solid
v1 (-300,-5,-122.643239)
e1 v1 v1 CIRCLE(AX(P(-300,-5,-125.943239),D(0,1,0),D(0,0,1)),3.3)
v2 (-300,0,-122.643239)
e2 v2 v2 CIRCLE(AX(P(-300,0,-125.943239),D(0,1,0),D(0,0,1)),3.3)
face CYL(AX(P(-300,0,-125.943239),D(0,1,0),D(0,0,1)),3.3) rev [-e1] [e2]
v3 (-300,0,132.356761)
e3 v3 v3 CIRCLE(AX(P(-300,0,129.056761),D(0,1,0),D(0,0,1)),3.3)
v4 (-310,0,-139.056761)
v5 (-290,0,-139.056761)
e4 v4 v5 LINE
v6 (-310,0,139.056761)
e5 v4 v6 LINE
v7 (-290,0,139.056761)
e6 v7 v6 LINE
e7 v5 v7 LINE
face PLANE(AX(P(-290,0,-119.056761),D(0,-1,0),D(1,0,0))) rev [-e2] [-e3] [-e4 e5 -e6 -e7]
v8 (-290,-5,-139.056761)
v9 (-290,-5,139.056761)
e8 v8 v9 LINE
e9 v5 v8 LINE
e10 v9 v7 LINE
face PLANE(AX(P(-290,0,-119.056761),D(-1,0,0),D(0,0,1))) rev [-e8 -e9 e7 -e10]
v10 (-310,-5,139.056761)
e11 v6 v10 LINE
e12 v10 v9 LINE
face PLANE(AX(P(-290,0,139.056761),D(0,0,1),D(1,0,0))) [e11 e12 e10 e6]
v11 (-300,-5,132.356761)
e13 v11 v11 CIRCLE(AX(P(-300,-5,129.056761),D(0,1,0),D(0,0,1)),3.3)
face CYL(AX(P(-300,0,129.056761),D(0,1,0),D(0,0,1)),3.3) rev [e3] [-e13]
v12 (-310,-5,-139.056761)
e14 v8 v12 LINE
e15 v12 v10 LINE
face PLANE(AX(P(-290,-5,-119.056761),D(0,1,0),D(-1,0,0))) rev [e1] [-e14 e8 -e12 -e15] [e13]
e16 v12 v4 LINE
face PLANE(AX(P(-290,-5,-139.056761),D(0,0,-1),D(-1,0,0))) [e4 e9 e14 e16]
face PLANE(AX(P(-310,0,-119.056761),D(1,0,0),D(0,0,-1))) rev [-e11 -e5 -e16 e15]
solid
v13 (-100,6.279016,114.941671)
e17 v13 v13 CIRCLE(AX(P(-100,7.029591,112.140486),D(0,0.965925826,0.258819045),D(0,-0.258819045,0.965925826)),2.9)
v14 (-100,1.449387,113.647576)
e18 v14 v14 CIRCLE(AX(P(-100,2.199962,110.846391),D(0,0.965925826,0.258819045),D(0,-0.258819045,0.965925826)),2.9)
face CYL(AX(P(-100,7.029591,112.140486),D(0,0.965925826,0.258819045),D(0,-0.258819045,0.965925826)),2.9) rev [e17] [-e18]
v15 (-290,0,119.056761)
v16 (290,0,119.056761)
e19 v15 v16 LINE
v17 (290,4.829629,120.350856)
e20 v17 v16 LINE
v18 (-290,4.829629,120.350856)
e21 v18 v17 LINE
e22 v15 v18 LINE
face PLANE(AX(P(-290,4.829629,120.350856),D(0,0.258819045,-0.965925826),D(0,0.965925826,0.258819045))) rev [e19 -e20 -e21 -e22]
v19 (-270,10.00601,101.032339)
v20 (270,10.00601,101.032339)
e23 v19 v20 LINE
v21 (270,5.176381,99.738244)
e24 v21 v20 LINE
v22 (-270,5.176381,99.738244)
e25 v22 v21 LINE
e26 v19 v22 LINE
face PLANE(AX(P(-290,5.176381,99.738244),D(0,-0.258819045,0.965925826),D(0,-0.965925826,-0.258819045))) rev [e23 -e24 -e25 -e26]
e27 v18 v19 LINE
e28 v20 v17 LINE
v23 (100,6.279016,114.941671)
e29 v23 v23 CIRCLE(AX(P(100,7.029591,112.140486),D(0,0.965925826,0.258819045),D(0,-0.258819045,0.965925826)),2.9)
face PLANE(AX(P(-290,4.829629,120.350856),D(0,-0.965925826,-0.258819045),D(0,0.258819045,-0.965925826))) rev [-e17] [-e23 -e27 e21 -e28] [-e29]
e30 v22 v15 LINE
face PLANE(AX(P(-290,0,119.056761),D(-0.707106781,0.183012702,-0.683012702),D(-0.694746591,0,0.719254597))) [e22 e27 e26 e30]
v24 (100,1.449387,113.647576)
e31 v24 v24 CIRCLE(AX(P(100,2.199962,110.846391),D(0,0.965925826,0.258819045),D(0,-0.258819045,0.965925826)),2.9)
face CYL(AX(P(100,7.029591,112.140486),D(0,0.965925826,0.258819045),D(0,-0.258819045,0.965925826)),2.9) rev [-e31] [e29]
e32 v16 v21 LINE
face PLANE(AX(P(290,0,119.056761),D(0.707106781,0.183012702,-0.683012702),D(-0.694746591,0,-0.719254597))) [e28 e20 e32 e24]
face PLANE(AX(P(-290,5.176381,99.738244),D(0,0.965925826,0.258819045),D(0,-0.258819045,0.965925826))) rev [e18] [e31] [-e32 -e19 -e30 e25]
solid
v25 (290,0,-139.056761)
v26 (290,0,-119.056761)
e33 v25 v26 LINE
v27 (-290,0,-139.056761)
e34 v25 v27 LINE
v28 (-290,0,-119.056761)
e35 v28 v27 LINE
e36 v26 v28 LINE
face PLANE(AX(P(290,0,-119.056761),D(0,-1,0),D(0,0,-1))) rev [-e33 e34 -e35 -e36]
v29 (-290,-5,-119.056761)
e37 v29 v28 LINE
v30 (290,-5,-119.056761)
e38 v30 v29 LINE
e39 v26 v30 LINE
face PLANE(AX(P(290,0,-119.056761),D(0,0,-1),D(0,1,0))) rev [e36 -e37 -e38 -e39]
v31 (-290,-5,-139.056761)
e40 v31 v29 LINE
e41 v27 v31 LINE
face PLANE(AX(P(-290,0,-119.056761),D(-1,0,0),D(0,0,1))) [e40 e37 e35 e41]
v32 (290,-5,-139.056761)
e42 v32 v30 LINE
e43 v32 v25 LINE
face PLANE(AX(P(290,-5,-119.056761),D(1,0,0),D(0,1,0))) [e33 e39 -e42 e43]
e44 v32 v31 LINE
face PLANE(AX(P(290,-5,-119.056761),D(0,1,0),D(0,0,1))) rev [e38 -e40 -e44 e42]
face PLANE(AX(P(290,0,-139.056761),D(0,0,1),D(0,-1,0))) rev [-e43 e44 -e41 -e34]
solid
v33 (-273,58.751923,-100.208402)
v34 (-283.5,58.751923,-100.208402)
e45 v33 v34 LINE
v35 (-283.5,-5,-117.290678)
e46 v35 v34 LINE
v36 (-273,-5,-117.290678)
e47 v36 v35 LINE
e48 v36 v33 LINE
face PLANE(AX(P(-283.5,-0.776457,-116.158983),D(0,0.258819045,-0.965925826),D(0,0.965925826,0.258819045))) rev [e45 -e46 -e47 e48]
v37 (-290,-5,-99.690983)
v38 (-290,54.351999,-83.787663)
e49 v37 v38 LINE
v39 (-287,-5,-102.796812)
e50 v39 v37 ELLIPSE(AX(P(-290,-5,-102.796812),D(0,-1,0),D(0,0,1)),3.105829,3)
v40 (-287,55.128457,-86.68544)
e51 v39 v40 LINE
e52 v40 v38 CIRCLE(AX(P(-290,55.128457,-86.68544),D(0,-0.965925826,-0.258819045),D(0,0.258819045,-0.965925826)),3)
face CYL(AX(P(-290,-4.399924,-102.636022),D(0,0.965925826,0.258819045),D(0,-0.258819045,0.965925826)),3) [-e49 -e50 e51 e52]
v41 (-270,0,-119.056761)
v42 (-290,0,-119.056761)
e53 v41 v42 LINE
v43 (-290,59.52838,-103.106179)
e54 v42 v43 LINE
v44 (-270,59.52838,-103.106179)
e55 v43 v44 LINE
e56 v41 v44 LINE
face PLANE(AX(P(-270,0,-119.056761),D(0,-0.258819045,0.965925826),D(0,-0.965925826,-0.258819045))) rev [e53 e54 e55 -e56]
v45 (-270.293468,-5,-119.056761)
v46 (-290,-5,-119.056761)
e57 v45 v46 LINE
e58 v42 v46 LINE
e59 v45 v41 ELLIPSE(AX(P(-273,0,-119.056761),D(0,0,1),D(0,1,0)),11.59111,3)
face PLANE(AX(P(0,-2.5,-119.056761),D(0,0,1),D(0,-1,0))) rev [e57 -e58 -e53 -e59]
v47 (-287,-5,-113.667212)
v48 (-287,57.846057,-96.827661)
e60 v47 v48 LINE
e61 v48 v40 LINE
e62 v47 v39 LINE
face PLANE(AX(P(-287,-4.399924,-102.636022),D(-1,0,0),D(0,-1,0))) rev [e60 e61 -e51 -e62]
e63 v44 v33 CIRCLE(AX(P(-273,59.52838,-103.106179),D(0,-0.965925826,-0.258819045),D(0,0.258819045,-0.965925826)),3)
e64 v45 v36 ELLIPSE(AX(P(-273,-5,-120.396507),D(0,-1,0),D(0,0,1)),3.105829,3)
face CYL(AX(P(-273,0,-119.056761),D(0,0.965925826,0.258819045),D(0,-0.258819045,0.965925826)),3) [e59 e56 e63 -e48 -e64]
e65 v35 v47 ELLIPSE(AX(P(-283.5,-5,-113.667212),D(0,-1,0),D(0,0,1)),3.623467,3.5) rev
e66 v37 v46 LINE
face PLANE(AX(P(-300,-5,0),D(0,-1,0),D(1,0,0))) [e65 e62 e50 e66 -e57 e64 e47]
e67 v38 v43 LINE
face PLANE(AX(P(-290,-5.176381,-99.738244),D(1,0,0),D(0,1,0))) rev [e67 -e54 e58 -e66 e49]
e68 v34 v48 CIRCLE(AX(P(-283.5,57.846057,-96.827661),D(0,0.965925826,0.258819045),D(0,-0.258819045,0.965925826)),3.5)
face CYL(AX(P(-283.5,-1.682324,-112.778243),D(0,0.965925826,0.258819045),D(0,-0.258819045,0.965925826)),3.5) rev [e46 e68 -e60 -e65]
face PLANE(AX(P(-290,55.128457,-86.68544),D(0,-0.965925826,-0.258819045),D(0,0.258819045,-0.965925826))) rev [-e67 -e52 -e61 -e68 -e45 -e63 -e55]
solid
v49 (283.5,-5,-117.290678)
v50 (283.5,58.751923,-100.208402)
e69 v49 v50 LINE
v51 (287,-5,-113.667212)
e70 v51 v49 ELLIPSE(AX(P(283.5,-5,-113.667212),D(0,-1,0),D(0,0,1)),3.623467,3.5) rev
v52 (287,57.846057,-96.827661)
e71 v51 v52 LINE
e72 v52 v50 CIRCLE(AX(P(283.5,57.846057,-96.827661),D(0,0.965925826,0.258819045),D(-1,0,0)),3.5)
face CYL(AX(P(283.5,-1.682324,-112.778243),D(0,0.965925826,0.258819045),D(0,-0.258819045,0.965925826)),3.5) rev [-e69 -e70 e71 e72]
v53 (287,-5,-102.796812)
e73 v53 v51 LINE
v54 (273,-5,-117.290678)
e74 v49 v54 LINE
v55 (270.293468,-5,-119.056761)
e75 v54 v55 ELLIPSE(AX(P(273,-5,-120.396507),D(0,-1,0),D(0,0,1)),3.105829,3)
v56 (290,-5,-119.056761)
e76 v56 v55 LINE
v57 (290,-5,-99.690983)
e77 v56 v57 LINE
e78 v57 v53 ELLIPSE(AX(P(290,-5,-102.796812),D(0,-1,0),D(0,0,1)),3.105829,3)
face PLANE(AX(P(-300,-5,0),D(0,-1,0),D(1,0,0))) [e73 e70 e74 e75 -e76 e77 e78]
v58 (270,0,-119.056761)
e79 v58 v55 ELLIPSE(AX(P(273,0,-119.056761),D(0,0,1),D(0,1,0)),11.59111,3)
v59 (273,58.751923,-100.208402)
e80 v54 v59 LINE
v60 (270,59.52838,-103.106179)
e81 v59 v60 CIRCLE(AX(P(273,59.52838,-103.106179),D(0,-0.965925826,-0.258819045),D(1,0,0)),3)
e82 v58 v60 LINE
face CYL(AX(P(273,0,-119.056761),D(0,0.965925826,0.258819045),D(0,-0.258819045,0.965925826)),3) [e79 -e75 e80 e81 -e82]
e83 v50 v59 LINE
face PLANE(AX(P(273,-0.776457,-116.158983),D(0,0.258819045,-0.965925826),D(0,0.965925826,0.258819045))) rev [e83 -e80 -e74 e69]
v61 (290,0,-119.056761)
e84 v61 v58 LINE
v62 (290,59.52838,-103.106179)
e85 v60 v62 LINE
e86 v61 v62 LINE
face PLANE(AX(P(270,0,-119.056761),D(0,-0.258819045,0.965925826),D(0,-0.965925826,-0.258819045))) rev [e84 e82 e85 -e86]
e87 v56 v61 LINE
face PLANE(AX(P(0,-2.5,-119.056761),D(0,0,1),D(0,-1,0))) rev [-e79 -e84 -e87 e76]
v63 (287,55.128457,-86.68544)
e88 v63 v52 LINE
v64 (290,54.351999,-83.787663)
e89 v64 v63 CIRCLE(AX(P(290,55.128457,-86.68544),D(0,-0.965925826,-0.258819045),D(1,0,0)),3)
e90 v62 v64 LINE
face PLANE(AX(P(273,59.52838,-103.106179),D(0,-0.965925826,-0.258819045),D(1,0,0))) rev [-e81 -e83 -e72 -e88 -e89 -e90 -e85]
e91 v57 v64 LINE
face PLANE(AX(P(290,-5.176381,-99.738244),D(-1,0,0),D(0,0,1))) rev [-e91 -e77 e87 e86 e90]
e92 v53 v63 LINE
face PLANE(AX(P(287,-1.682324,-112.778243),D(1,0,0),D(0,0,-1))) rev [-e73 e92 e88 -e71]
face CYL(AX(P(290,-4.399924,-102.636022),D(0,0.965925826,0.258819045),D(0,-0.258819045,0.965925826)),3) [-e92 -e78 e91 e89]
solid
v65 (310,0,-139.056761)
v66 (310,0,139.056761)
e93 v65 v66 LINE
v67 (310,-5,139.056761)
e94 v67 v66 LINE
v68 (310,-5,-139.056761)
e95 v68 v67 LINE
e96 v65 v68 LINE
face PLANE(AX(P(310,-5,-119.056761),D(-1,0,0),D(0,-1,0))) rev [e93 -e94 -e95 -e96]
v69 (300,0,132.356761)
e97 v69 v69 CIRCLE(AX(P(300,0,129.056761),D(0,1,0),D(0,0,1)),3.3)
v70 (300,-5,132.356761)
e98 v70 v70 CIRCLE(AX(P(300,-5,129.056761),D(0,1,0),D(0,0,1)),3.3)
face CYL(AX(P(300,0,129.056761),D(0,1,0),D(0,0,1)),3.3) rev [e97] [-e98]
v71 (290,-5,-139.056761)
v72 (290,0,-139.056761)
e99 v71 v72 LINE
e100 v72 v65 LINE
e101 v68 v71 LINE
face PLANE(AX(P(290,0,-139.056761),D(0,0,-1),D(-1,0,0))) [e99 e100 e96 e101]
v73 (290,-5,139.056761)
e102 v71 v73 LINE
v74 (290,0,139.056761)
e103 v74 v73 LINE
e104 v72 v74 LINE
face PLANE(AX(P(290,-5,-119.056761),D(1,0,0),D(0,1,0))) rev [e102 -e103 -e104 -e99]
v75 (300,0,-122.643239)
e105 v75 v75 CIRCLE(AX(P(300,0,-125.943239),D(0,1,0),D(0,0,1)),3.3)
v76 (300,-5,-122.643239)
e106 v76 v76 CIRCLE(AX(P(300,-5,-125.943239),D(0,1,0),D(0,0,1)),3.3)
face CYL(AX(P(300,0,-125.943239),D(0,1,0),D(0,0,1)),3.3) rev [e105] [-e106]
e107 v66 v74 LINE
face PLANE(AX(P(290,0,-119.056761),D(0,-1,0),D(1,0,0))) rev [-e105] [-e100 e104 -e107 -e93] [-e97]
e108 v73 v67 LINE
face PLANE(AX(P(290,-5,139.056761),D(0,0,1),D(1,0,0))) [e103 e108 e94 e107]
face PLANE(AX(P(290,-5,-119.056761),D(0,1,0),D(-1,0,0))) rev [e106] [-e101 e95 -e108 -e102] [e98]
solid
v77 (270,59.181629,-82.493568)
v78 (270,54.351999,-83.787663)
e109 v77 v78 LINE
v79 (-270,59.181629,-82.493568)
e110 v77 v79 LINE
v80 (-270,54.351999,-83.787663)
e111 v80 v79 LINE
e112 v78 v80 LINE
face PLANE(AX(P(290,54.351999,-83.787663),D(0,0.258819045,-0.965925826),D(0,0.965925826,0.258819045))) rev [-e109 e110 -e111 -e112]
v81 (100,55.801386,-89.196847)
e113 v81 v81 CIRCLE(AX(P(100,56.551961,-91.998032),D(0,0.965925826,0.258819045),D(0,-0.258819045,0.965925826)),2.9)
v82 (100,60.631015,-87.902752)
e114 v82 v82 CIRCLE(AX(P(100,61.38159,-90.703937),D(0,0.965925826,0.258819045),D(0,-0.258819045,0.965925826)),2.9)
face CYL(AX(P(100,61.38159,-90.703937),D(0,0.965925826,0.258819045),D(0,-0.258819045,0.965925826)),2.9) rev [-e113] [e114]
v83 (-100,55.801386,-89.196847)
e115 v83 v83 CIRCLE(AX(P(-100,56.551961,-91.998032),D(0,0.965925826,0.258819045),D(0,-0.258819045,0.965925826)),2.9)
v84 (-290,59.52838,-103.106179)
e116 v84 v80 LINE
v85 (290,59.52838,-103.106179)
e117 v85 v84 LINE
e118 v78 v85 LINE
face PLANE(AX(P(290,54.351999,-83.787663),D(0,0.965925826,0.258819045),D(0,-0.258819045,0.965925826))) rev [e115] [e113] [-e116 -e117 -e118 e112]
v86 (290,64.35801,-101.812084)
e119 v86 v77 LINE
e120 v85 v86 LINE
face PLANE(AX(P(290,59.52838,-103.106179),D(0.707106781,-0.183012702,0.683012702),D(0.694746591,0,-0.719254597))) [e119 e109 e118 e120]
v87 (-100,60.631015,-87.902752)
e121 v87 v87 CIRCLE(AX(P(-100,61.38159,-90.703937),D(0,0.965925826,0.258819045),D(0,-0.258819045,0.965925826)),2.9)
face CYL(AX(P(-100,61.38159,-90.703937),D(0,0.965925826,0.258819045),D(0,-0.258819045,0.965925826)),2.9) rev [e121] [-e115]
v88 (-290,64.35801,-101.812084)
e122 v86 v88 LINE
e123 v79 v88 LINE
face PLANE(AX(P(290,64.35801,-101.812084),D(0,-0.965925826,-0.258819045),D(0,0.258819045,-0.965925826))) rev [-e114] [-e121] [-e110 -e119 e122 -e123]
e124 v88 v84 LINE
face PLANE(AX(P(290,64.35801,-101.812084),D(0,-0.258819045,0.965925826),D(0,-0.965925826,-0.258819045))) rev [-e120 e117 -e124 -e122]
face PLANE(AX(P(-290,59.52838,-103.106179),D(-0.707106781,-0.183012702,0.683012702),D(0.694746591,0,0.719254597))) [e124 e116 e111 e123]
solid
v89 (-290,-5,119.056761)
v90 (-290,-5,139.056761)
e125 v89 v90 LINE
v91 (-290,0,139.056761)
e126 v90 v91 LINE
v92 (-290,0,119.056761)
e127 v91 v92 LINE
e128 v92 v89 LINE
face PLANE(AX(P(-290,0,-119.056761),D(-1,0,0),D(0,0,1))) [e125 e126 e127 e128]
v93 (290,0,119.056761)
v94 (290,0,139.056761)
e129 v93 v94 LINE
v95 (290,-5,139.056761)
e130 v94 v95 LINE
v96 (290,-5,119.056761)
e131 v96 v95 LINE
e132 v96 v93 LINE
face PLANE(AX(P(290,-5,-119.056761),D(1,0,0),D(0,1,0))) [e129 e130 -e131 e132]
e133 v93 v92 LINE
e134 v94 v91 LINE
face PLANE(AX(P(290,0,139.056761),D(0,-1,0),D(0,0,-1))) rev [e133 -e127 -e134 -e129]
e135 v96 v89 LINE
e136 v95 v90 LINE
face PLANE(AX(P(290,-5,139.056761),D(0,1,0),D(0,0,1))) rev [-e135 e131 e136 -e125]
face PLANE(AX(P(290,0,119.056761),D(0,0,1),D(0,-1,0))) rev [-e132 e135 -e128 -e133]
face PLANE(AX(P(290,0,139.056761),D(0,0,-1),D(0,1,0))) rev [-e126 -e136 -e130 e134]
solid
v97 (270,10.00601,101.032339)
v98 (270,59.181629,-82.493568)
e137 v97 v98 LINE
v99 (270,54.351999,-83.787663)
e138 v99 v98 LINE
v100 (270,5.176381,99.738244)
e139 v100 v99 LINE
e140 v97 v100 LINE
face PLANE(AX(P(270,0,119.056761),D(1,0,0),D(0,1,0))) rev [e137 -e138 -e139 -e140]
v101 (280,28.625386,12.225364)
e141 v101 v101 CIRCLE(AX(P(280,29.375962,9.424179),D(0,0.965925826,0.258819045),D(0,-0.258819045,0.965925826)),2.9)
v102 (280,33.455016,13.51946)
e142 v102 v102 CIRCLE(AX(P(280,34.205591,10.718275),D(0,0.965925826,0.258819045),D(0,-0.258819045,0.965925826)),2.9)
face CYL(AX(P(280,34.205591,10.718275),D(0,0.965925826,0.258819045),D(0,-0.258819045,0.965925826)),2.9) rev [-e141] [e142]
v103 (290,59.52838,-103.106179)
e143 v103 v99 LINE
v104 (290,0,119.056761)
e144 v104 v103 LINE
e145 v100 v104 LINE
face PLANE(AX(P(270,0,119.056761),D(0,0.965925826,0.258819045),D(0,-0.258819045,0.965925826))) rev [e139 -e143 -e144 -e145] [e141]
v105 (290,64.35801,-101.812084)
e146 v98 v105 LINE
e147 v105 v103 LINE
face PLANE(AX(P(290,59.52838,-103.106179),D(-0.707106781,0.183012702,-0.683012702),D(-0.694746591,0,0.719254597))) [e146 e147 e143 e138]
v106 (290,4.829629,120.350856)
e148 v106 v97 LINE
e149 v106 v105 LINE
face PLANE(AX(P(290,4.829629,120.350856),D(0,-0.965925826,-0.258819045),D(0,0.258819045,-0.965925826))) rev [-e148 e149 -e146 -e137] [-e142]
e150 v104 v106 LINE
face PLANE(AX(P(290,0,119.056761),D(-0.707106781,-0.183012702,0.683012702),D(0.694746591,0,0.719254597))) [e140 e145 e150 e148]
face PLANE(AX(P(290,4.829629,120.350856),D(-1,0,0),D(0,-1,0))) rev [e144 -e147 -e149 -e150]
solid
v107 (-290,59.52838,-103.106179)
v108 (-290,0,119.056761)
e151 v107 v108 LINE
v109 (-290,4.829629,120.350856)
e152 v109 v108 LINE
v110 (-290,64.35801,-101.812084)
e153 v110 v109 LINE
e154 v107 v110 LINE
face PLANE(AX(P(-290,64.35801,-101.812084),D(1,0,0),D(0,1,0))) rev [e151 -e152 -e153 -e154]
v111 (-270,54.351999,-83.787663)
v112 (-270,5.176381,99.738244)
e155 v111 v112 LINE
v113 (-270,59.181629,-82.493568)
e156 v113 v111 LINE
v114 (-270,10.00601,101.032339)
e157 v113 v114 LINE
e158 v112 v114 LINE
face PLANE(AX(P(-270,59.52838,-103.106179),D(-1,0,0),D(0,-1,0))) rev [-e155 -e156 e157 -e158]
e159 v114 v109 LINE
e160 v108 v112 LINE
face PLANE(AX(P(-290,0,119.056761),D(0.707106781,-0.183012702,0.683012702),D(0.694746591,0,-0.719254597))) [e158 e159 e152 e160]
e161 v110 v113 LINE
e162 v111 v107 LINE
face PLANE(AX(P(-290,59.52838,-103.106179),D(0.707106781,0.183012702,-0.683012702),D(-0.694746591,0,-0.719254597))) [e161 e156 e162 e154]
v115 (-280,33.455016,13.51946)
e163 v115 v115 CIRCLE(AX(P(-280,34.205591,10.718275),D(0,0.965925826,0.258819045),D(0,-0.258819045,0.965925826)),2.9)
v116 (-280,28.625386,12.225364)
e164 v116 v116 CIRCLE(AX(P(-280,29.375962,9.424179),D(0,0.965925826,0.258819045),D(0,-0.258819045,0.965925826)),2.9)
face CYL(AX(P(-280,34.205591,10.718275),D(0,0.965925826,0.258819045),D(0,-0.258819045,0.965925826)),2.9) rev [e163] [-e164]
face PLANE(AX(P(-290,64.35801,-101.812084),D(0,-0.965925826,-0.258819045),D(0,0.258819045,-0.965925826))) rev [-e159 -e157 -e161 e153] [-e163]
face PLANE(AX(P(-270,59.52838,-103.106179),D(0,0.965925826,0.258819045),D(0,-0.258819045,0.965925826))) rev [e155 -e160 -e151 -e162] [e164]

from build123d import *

# Parameters (mm, degrees)
TUBE_RECTANGULAR_50_X_30_X_2_6_46_DEPTH      = 251.615528128
TUBE_RECTANGULAR_50_X_30_X_2_6_46_DEPTH_BACK = 21.615528128
SKETCH1_W                                    = 20
SKETCH1_H                                    = 5
SKETCH1_ON_SEGMENT_2_W                       = 20
SKETCH1_ON_SEGMENT_2_H                       = 5
TUBE_RECTANGULAR_50_X_30_X_2_6_46_3_DEPTH    = 623.231056256
SKETCH1_ON_SEGMENT_3_W                       = 20
SKETCH1_ON_SEGMENT_3_H                       = 5
TUBE_RECTANGULAR_50_X_30_X_2_6_46_5_DEPTH    = 273.231056256
SKETCH1_ON_SEGMENT_4_W                       = 20
SKETCH1_ON_SEGMENT_4_H                       = 5
TUBE_RECTANGULAR_50_X_30_X_2_6_46_7_DEPTH    = 623.231056256
L_ANGLE_EQUAL_20X20X3_13_DEPTH               = 61.628314259
L_ANGLE_EQUAL_20X20X3_13_2_DEPTH             = 61.628314259
TUBE_START                                   = -5
TUBE_RECTANGULAR_50_X_30_X_2_6_47_OUTL_W     = 20
TUBE_RECTANGULAR_50_X_30_X_2_6_47_OUTL_H     = 278.113521494
TUBE_RECTANGULAR_50_X_30_X_2_6_47_DEPTH      = 5
TUBE_START_2                                 = -290
TUBE_RECTANGULAR_50_X_30_X_2_6_47_2_OU_W     = 5
TUBE_RECTANGULAR_50_X_30_X_2_6_47_2_OU_H     = 20
TUBE_RECTANGULAR_50_X_30_X_2_6_47_2_DEPTH    = 580
TUBE_RECTANGULAR_50_X_30_X_2_6_47_3_OU_W     = 5
TUBE_RECTANGULAR_50_X_30_X_2_6_47_3_OU_H     = 20
TUBE_RECTANGULAR_50_X_30_X_2_6_47_3_DEPTH    = 580
TUBE_RECTANGULAR_50_X_30_X_2_6_47_4_OU_W     = 20
TUBE_RECTANGULAR_50_X_30_X_2_6_47_4_OU_H     = 278.113521494
TUBE_RECTANGULAR_50_X_30_X_2_6_47_4_DEPTH    = 5
BODY_START                                   = 61.628314241
BODY_5_RUN_ON_DEPTH                          = 5.176381
BODY_START_2                                 = 61.62831424
BODY_6_RUN_ON_DEPTH                          = 5.176381
SKETCH20_W                                   = 3.3
SKETCH20_H                                   = 5
M6_CLEARANCE_HOLE1_AT_2_COUNT                = 2
M6_CLEARANCE_HOLE1_AT_2_PITCH                = 255
M6_CLEARANCE_HOLE1_AT_3_COUNT                = 2
M6_CLEARANCE_HOLE1_AT_3_PITCH                = 651.939414363
M6_CLEARANCE_HOLE1_AT_4_COUNT                = 2
M6_CLEARANCE_HOLE1_AT_4_PITCH                = 600
ESQUISSE2_W                                  = 2.9
ESQUISSE2_H                                  = 76.634324293
D_GAGEMENT_M51_AT_2_COUNT                    = 2
D_GAGEMENT_M51_AT_2_PITCH                    = 290
D_GAGEMENT_M51_AT_3_COUNT                    = 2
D_GAGEMENT_M51_AT_3_PITCH                    = 210
D_GAGEMENT_M51_AT_4_COUNT                    = 2
D_GAGEMENT_M51_AT_4_PITCH                    = 208.386659842
D_GAGEMENT_M51_AT_5_COUNT                    = 2
D_GAGEMENT_M51_AT_5_PITCH                    = 394.239774756
D_GAGEMENT_M51_AT_6_COUNT                    = 2
D_GAGEMENT_M51_AT_6_PITCH                    = 200


# Read off the part's stored shape, not the designer's step: Tube (rectangular) 50 X 30 X 2.6(47)
with BuildPart() as part:
    # Sketch1 → Tube (rectangular) 50 X 30 X 2.6(46) (new, two sides: drawn at the far end of the back side and taken through both)
    with BuildSketch(Plane(origin=(-280, 2.414814566, 119.70380836), x_dir=(1, 0, 0), z_dir=(1.2067641572012591e-15, 0.25881904510252146, -0.9659258262890681)).offset(-TUBE_RECTANGULAR_50_X_30_X_2_6_46_DEPTH_BACK)):
        Rectangle(SKETCH1_W, SKETCH1_H)
    extrude(amount=TUBE_RECTANGULAR_50_X_30_X_2_6_46_DEPTH + TUBE_RECTANGULAR_50_X_30_X_2_6_46_DEPTH_BACK)

    # Tube (rectangular) 50 X 30 X 2.6(46) mitr
    split(bisect_by=Plane(origin=(-290, 0, 119.056760747), x_dir=(-0.250562807, -0.968100346, 0), z_dir=(-0.707106781, 0.183012702, -0.683012702)), keep=Keep.TOP)

    # Tube (rectangular) 50 X 30 X 2.6(46)  2
    split(bisect_by=Plane(origin=(-290, 59.528380374, -103.106179299), x_dir=(0.250562807, -0.968100346, 0), z_dir=(-0.707106781, -0.183012702, 0.683012702)), keep=Keep.TOP)


with BuildPart() as body_2:
    # Sketch1 on segment 2 (carried to segment 2) → Tube (rectangular) 50 X 30 X 2.6(46)  3 (new body)
    with BuildSketch(Plane(origin=(-311.615528128, 59.355004488, -92.799873424), x_dir=(0, -0.258819045, 0.965925826), z_dir=(1, 0, 0))):
        Rectangle(SKETCH1_ON_SEGMENT_2_W, SKETCH1_ON_SEGMENT_2_H)
    extrude(amount=TUBE_RECTANGULAR_50_X_30_X_2_6_46_3_DEPTH)

    # Tube _rectangular_ 50 X 30 X 2.6_46 3 mi
    split(bisect_by=Plane(origin=(-290, 59.528380374, -103.106179299), x_dir=(-0.250562807, 0.968100346, 0), z_dir=(0.707106781, 0.183012702, -0.683012702)), keep=Keep.TOP)

    # Tube (rectangular) 50 X 30 X 2.6(46)  4
    split(bisect_by=Plane(origin=(290, 59.528380374, -103.106179299), x_dir=(-0.250562807, -0.968100346, 0), z_dir=(-0.707106781, 0.183012702, -0.683012702)), keep=Keep.TOP)


with BuildPart() as body_3:
    # Sketch1 on segment 3 (carried to segment 3) → Tube (rectangular) 50 X 30 X 2.6(46)  5 (new body)
    with BuildSketch(Plane(origin=(280, 67.537705289, -123.338128554), x_dir=(-1, 0, 0), z_dir=(0, -0.258819045, 0.965925826))):
        Rectangle(SKETCH1_ON_SEGMENT_3_W, SKETCH1_ON_SEGMENT_3_H)
    extrude(amount=TUBE_RECTANGULAR_50_X_30_X_2_6_46_5_DEPTH)

    # Tube _rectangular_ 50 X 30 X 2.6_46 5 mi
    split(bisect_by=Plane(origin=(290, 59.528380374, -103.106179299), x_dir=(0.250562807, 0.968100346, 0), z_dir=(0.707106781, -0.183012702, 0.683012702)), keep=Keep.TOP)

    # Tube (rectangular) 50 X 30 X 2.6(46)  6
    split(bisect_by=Plane(origin=(290, 0, 119.056760747), x_dir=(-0.250562807, 0.968100346, 0), z_dir=(0.707106781, 0.183012702, -0.683012702)), keep=Keep.TOP)


with BuildPart() as body_4:
    # Sketch1 on segment 4 (carried to segment 4) → Tube (rectangular) 50 X 30 X 2.6(46)  7 (new body)
    with BuildSketch(Plane(origin=(311.615528128, 5.003005017, 110.044550097), x_dir=(0, 0.258819045, -0.965925826), z_dir=(-1, 0, 0))):
        Rectangle(SKETCH1_ON_SEGMENT_4_W, SKETCH1_ON_SEGMENT_4_H)
    extrude(amount=TUBE_RECTANGULAR_50_X_30_X_2_6_46_7_DEPTH)

    # Tube _rectangular_ 50 X 30 X 2.6_46 7 mi
    split(bisect_by=Plane(origin=(-290, 0, 119.056760747), x_dir=(0.250562807, 0.968100346, 0), z_dir=(0.707106781, -0.183012702, 0.683012702)), keep=Keep.TOP)

    # Tube (rectangular) 50 X 30 X 2.6(46)  8
    split(bisect_by=Plane(origin=(290, 0, 119.056760747), x_dir=(0.250562807, -0.968100346, 0), z_dir=(-0.707106781, -0.183012702, 0.683012702)), keep=Keep.TOP)

    # Esquisse2 → Dégagement M51 (revolve, cut)
    with BuildSketch(Plane(origin=(100, 7.029591015, 112.140486449), x_dir=(0, -0.2588190451025213, 0.9659258262890682), z_dir=(1, 0, 0))):
        with Locations((1.45, 38.317162147)):
            Rectangle(ESQUISSE2_W, ESQUISSE2_H)
    d_gagement_m51 = revolve(axis=Axis((100, 13.163220012, 113.783987386), (-9.20037838079571e-15, -0.9659258262890682, -0.25881904510252135)), mode=Mode.SUBTRACT)

    # Dégagement M51 at 6: Dégagement M51 ×2
    with Locations(*[(-i * D_GAGEMENT_M51_AT_6_PITCH, 0, 0) for i in range(1, D_GAGEMENT_M51_AT_6_COUNT)]):
        add(d_gagement_m51, mode=Mode.SUBTRACT)


with BuildPart() as body_5:
    # Sketch13 → L angle (equal) 20X20X3(13) (new body)
    with BuildSketch(Plane(origin=(-290, 59.528380374, -103.106179299), x_dir=(1, 0, 0), z_dir=(0, -0.9659258262890681, -0.25881904510252174))):
        with BuildLine():
            Line((0, 20), (0, 0))
            Line((0, 0), (20, 0))
            ThreePointArc((20, 0), (19.121320344, 2.121320344), (17, 3))
            Line((17, 3), (6.5, 3))
            ThreePointArc((6.5, 3), (4.025126266, 4.025126266), (3, 6.5))
            Line((3, 6.5), (3, 17))
            ThreePointArc((3, 17), (2.121320344, 19.121320344), (0, 20))
        make_face()
    extrude(amount=L_ANGLE_EQUAL_20X20X3_13_DEPTH)

    # Sketch13 → body 5 run on (add)
    with BuildSketch(Plane(origin=(-290, 59.528380374, -103.106179299), x_dir=(1, 0, 0), z_dir=(0, -0.9659258262890681, -0.25881904510252174)).offset(BODY_START)):
        with BuildLine():
            Line((0, 20), (0, 0))
            Line((0, 0), (20, 0))
            ThreePointArc((20, 0), (19.121320344, 2.121320344), (17, 3))
            Line((17, 3), (6.5, 3))
            ThreePointArc((6.5, 3), (4.025126266, 4.025126266), (3, 6.5))
            Line((3, 6.5), (3, 17))
            ThreePointArc((3, 17), (2.121320344, 19.121320344), (0, 20))
        make_face()
    extrude(amount=BODY_5_RUN_ON_DEPTH)

    # Trim_Extend3 2
    split(bisect_by=Plane(origin=(-300, -5, 0), x_dir=(-1, 0, 0), z_dir=(0, 1, 0)), keep=Keep.TOP)

    # Trim/Extend5
    split(bisect_by=Plane(origin=(0, -2.5, -119.056760747), x_dir=(0, -1, 0), z_dir=(0, 0, 1)), keep=Keep.TOP)


with BuildPart() as body_6:
    # Sketch13 on segment 2 (carried to segment 2) → L angle _equal_ 20X20X3_13 2 (new body)
    with BuildSketch(Plane(origin=(290, 59.528380374, -103.106179299), x_dir=(0, -0.258819045, 0.965925826), z_dir=(0, -0.965925826, -0.258819045))):
        with BuildLine():
            Line((0, 20), (0, 0))
            Line((0, 0), (20, 0))
            ThreePointArc((20, 0), (19.121320344, 2.121320344), (17, 3))
            Line((17, 3), (6.5, 3))
            ThreePointArc((6.5, 3), (4.025126266, 4.025126266), (3, 6.5))
            Line((3, 6.5), (3, 17))
            ThreePointArc((3, 17), (2.121320344, 19.121320344), (0, 20))
        make_face()
    extrude(amount=L_ANGLE_EQUAL_20X20X3_13_2_DEPTH)

    # Sketch13 on segment 2 (carried to segment 2) → body 6 run on (add)
    with BuildSketch(Plane(origin=(290, 59.528380374, -103.106179299), x_dir=(0, -0.258819045, 0.965925826), z_dir=(0, -0.965925826, -0.258819045)).offset(BODY_START_2)):
        with BuildLine():
            Line((0, 20), (0, 0))
            Line((0, 0), (20, 0))
            ThreePointArc((20, 0), (19.121320344, 2.121320344), (17, 3))
            Line((17, 3), (6.5, 3))
            ThreePointArc((6.5, 3), (4.025126266, 4.025126266), (3, 6.5))
            Line((3, 6.5), (3, 17))
            ThreePointArc((3, 17), (2.121320344, 19.121320344), (0, 20))
        make_face()
    extrude(amount=BODY_6_RUN_ON_DEPTH)

    # Trim_Extend3 2
    split(bisect_by=Plane(origin=(-300, -5, 0), x_dir=(-1, 0, 0), z_dir=(0, 1, 0)), keep=Keep.TOP)

    # Trim/Extend5
    split(bisect_by=Plane(origin=(0, -2.5, -119.056760747), x_dir=(0, -1, 0), z_dir=(0, 0, 1)), keep=Keep.TOP)


with BuildPart() as body_7:
    # Tube (rectangular) 50 X 30 X 2.6(47) outl → Tube (rectangular) 50 X 30 X 2.6(47) (new body)
    with BuildSketch(Plane(origin=(0, 0, 0), x_dir=(1, 0, 0), z_dir=(0, 1, 0)).offset(TUBE_START)):
        with Locations((-300, 0)):
            Rectangle(TUBE_RECTANGULAR_50_X_30_X_2_6_47_OUTL_W, TUBE_RECTANGULAR_50_X_30_X_2_6_47_OUTL_H)
    extrude(amount=TUBE_RECTANGULAR_50_X_30_X_2_6_47_DEPTH)


with BuildPart() as body_8:
    # Tube _rectangular_ 50 X 30 X 2.6_47 2 ou → Tube _rectangular_ 50 X 30 X 2.6_47 2 (new body)
    with BuildSketch(Plane.YZ.offset(TUBE_START_2)):
        with Locations((-2.5, 129.056760747)):
            Rectangle(TUBE_RECTANGULAR_50_X_30_X_2_6_47_2_OU_W, TUBE_RECTANGULAR_50_X_30_X_2_6_47_2_OU_H)
    extrude(amount=TUBE_RECTANGULAR_50_X_30_X_2_6_47_2_DEPTH)


with BuildPart() as body_9:
    # Tube _rectangular_ 50 X 30 X 2.6_47 3 ou → Tube _rectangular_ 50 X 30 X 2.6_47 3 (new body)
    with BuildSketch(Plane.YZ.offset(TUBE_START_2)):
        with Locations((-2.5, -129.056760747)):
            Rectangle(TUBE_RECTANGULAR_50_X_30_X_2_6_47_3_OU_W, TUBE_RECTANGULAR_50_X_30_X_2_6_47_3_OU_H)
    extrude(amount=TUBE_RECTANGULAR_50_X_30_X_2_6_47_3_DEPTH)


with BuildPart() as body_10:
    # Tube _rectangular_ 50 X 30 X 2.6_47 4 ou → Tube _rectangular_ 50 X 30 X 2.6_47 4 (new body)
    with BuildSketch(Plane(origin=(0, 0, 0), x_dir=(1, 0, 0), z_dir=(0, 1, 0)).offset(TUBE_START)):
        with Locations((300, 0)):
            Rectangle(TUBE_RECTANGULAR_50_X_30_X_2_6_47_4_OU_W, TUBE_RECTANGULAR_50_X_30_X_2_6_47_4_OU_H)
    extrude(amount=TUBE_RECTANGULAR_50_X_30_X_2_6_47_4_DEPTH)

    # Sketch20 → M6 Clearance Hole1 (revolve, cut)
    with BuildSketch(Plane(origin=(300, 0, -125.943239253), x_dir=(0, 0, 1), z_dir=(1, 0, 0))):
        with Locations((1.65, 2.5)):
            Rectangle(SKETCH20_W, SKETCH20_H)
    m6_clearance_hole1 = revolve(axis=Axis((300, 6.35, -125.943239253), (0, -1, 0)), mode=Mode.SUBTRACT)

    # M6 Clearance Hole1 at 2: M6 Clearance Hole1 ×2
    with Locations(*[(0, 0, i * M6_CLEARANCE_HOLE1_AT_2_PITCH) for i in range(1, M6_CLEARANCE_HOLE1_AT_2_COUNT)]):
        add(m6_clearance_hole1, mode=Mode.SUBTRACT)


with BuildPart() as body_7_1:
    add(body_7.part)

    # M6 Clearance Hole1 at 3: M6 Clearance Hole1 ×2
    with Locations(*[Vector(-0.9203309184584745, 9.61147403107494e-15, 0.3911406403448521) * (i * M6_CLEARANCE_HOLE1_AT_3_PITCH) for i in range(1, M6_CLEARANCE_HOLE1_AT_3_COUNT)]):
        add(m6_clearance_hole1, mode=Mode.SUBTRACT)

    # M6 Clearance Hole1 at 4: M6 Clearance Hole1 ×2
    with Locations(*[(-i * M6_CLEARANCE_HOLE1_AT_4_PITCH, 0, 0) for i in range(1, M6_CLEARANCE_HOLE1_AT_4_COUNT)]):
        add(m6_clearance_hole1, mode=Mode.SUBTRACT)


with BuildPart() as body_2_1:
    add(body_2.part)

    # Dégagement M51 at 2: Dégagement M51 ×2
    with Locations(*[Vector(-0.6896551724137929, 0.18742068783286647, -0.6994635293817376) * (i * D_GAGEMENT_M51_AT_2_PITCH) for i in range(1, D_GAGEMENT_M51_AT_2_COUNT)]):
        add(d_gagement_m51, mode=Mode.SUBTRACT)

    # Dégagement M51 at 3: Dégagement M51 ×2
    with Locations(*[Vector(-1.887261657944815e-15, 0.2588190451025214, -0.9659258262890681) * (i * D_GAGEMENT_M51_AT_3_PITCH) for i in range(1, D_GAGEMENT_M51_AT_3_COUNT)]):
        add(d_gagement_m51, mode=Mode.SUBTRACT)


with BuildPart() as body_3_1:
    add(body_3.part)

    # Dégagement M51 at 4: Dégagement M51 ×2
    with Locations(*[Vector(0.8637789008984335, 0.1304114176809645, -0.4867020366724752) * (i * D_GAGEMENT_M51_AT_4_PITCH) for i in range(1, D_GAGEMENT_M51_AT_4_COUNT)]):
        add(d_gagement_m51, mode=Mode.SUBTRACT)


with BuildPart() as part_1:
    add(part.part)

    # Dégagement M51 at 5: Dégagement M51 ×2
    with Locations(*[Vector(-0.963880420829616, 0.06893266858362566, -0.2572602214553631) * (i * D_GAGEMENT_M51_AT_5_PITCH) for i in range(1, D_GAGEMENT_M51_AT_5_COUNT)]):
        add(d_gagement_m51, mode=Mode.SUBTRACT)


solid = Compound([body_4.part, body_5.part, body_6.part, body_8.part, body_9.part, body_10.part, body_7_1.part, body_2_1.part, body_3_1.part, part_1.part])
